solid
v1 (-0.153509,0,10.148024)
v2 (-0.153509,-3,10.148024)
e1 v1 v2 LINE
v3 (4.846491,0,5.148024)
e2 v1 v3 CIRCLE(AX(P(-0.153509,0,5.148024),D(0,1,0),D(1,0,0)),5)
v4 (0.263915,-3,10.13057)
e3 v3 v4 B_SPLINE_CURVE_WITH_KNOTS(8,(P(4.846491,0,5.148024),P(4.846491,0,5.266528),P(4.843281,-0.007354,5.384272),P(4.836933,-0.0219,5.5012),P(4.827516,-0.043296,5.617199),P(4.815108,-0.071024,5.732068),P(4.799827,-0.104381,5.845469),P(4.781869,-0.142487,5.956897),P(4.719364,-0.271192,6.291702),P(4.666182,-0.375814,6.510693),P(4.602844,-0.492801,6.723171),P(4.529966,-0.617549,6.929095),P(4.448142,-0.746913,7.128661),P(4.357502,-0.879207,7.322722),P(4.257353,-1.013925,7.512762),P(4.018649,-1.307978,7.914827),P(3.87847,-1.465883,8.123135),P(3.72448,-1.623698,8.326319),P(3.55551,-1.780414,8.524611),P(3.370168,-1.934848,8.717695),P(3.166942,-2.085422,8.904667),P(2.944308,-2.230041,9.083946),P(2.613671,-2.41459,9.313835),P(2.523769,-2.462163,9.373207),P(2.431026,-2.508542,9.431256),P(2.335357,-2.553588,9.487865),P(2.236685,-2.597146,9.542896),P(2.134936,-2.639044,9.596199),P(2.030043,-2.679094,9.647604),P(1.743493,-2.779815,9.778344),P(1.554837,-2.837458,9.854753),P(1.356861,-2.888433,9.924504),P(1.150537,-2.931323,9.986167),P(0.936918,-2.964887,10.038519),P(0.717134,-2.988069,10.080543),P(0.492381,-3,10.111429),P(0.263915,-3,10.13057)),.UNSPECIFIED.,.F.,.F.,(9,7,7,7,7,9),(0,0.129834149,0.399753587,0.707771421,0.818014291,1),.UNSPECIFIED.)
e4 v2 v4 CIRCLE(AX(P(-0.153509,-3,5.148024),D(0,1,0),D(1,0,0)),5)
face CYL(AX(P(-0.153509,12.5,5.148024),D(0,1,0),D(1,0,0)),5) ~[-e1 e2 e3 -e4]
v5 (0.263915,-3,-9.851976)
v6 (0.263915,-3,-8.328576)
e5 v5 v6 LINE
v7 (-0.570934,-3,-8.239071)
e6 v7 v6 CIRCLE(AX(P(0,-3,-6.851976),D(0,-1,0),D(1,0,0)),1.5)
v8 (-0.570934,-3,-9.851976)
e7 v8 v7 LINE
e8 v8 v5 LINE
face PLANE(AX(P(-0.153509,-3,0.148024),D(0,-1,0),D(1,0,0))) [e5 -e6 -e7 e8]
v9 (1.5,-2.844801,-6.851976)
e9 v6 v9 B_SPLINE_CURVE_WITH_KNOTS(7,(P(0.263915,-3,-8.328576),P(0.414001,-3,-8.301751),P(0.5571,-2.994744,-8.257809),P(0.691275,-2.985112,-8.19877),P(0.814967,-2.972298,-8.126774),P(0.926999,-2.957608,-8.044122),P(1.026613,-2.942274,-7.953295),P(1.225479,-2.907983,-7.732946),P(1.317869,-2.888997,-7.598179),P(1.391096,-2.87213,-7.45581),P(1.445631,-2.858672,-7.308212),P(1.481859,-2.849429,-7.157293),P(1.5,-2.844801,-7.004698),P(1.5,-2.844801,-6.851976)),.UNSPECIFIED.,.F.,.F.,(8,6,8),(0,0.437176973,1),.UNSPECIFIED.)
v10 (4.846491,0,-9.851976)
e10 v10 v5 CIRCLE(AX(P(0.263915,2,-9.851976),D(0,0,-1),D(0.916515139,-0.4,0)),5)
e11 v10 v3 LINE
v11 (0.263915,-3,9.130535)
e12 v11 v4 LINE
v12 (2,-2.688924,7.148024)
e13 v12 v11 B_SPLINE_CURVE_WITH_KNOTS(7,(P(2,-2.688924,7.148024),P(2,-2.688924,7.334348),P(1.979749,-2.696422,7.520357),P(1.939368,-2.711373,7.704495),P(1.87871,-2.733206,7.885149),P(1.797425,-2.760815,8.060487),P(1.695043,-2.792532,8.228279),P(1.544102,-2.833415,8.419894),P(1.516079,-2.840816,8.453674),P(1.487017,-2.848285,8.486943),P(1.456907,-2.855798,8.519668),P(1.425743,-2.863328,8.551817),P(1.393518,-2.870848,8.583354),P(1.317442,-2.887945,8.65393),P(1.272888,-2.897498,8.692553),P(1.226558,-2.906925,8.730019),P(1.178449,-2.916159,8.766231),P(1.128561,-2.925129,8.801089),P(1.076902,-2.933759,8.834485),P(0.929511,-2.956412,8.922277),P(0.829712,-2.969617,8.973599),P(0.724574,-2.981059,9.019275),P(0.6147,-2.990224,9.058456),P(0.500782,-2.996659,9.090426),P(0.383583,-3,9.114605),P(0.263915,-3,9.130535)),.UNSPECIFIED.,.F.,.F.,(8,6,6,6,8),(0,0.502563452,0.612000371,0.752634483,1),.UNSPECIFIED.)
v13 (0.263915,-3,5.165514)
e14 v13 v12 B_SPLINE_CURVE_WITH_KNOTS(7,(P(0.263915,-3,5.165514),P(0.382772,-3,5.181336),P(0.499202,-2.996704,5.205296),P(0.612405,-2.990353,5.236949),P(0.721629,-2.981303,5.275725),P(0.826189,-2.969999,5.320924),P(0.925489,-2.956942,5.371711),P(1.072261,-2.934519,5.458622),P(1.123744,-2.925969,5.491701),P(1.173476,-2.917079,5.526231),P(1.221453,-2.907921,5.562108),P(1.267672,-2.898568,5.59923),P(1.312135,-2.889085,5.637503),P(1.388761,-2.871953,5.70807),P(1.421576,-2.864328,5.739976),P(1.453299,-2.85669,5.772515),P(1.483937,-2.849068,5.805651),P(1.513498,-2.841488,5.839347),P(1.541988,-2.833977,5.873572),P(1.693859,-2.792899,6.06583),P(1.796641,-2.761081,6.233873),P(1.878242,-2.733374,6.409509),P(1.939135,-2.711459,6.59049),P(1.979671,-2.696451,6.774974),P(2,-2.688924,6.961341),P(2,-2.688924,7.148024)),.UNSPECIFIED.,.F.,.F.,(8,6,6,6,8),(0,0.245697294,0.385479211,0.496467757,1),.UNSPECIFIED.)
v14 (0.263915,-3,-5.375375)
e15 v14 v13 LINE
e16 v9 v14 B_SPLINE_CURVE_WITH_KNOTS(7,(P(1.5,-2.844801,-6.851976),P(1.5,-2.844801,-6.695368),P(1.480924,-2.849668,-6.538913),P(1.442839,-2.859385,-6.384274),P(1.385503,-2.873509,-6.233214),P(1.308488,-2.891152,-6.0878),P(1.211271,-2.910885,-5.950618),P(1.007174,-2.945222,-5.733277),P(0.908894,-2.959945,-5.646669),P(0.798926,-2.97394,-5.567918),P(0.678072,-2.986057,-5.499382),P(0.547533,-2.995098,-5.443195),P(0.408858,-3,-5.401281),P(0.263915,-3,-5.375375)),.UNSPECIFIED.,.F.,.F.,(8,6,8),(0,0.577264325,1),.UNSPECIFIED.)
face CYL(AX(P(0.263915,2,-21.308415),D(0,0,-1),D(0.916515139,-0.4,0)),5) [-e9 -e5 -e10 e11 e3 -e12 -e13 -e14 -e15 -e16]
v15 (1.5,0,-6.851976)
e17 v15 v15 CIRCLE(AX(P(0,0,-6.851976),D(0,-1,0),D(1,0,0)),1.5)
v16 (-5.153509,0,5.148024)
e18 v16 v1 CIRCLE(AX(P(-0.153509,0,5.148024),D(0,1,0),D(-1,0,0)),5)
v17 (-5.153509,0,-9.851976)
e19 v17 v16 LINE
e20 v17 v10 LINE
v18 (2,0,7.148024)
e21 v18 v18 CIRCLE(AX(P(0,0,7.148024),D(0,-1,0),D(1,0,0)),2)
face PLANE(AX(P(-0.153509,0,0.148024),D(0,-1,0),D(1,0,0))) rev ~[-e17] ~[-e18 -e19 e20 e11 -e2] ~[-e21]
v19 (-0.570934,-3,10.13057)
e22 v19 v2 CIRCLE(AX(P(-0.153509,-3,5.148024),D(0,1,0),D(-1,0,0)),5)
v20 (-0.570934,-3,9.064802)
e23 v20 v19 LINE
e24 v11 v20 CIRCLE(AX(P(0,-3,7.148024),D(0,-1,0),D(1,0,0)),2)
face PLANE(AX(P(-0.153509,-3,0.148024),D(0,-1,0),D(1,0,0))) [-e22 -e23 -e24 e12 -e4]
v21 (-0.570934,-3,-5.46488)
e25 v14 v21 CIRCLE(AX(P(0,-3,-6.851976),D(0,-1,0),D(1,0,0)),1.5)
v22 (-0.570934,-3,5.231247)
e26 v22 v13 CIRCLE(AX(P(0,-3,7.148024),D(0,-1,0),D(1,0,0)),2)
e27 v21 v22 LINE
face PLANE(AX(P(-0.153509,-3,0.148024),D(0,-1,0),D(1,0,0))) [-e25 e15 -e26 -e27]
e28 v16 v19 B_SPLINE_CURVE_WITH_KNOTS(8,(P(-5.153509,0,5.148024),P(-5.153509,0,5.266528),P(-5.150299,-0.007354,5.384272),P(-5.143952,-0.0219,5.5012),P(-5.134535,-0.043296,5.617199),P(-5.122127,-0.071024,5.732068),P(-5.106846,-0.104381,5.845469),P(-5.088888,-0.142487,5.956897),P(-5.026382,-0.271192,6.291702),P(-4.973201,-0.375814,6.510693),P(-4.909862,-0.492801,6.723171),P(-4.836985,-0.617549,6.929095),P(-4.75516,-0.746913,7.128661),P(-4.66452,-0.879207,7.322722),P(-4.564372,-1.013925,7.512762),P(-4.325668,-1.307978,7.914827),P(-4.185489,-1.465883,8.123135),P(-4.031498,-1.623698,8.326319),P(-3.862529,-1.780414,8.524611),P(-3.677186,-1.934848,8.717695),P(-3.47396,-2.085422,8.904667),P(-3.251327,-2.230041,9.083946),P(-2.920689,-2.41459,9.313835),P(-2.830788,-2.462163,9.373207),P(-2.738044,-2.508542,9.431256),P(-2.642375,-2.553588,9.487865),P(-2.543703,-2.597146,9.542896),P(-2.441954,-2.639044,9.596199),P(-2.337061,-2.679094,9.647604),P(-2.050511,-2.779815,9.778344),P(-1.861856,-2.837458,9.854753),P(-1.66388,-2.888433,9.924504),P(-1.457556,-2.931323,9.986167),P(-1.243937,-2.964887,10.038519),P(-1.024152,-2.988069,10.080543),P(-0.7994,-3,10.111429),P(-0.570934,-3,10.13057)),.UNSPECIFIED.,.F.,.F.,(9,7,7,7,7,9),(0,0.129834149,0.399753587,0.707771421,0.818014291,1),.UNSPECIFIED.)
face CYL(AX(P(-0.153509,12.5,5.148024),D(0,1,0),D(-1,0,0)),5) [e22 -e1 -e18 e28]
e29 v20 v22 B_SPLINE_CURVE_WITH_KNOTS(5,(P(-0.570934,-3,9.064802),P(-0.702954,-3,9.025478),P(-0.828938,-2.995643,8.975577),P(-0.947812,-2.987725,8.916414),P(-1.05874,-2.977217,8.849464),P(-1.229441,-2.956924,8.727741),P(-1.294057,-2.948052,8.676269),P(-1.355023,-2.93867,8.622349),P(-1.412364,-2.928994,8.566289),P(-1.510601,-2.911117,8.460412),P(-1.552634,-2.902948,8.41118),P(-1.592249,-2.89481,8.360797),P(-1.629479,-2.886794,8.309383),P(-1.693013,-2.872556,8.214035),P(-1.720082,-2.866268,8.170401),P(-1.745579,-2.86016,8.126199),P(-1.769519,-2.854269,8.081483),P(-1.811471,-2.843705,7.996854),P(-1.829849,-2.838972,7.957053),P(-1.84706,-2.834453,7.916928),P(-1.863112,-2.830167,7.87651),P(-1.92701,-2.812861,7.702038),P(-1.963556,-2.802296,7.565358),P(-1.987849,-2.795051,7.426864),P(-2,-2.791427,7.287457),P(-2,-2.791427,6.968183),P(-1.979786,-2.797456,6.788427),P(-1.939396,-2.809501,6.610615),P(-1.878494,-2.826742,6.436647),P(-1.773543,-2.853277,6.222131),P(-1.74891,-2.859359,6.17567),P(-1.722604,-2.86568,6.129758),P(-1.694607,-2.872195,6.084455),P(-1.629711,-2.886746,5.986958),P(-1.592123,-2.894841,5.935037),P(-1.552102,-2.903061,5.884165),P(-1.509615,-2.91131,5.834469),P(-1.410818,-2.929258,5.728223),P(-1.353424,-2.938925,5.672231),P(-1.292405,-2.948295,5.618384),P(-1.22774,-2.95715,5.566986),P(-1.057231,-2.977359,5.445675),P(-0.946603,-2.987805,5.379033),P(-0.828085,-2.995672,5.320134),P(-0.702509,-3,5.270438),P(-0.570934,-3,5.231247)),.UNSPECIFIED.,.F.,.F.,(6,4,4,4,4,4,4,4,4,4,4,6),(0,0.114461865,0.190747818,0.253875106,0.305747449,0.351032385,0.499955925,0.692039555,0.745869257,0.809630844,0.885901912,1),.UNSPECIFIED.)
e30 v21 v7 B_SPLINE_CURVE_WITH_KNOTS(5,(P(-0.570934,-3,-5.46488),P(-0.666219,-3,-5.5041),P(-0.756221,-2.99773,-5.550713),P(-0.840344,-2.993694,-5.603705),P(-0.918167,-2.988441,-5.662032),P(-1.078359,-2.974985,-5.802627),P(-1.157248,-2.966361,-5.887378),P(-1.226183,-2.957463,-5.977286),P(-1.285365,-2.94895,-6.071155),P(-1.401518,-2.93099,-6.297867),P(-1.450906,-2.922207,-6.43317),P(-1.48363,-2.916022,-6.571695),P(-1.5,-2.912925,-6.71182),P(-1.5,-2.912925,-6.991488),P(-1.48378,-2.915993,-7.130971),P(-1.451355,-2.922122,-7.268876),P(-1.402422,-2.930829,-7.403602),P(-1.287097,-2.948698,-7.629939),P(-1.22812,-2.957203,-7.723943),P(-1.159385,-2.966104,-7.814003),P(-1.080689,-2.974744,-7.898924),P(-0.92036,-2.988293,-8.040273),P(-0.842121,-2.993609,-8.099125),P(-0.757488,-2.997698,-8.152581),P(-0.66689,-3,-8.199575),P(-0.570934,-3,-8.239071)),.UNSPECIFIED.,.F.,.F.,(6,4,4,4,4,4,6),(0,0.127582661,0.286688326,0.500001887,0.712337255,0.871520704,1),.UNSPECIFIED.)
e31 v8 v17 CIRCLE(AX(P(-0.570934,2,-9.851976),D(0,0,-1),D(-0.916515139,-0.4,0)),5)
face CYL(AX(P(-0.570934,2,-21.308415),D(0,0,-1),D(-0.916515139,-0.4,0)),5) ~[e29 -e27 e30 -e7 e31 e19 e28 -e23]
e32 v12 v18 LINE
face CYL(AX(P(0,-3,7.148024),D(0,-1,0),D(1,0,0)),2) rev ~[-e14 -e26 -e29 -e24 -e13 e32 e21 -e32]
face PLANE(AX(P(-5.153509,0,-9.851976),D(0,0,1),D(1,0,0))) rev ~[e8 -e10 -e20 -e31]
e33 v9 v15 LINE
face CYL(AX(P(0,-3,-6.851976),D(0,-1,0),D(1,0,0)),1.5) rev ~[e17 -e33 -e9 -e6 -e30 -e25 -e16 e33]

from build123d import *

# Parameters (mm, degrees)
F0_W        = 10
F0_H        = 20
F1_DEPTH    = 3
F2_R        = 2
F2_R_2      = 1.5
F3_DEPTH    = 3.001
F4_T1_DEPTH = 28
F4_T3_DEPTH = 42.9128784748


# Not quite as in the source:
# - a fillet or chamfer that OpenCascade refuses, or shapes differently, is made with other operations: its cross-section is extruded or revolved along the edge and cut away or added


with BuildPart() as f1:
    # F0 (on Front) → F1 (new body)
    with BuildSketch(Plane.XZ):
        with Locations((-0.1535092495, 0.14802441)):
            Rectangle(F0_W, F0_H)
    extrude(amount=F1_DEPTH)

    # F2 (on face) → F3 (cut, through all)
    with BuildSketch(Plane.XZ.offset(3)):
        with Locations((0, 7.14802441)):
            Circle(F2_R)
        with Locations((0, -6.85197559)):
            Circle(F2_R_2)
    extrude(amount=-F3_DEPTH, mode=Mode.SUBTRACT)

    # F4: fillet of radius 5 on 4 edges, made by hand

    # F4_s2 → F4_t1 (cut)
    with BuildSketch(Plane.XZ.offset(-12.5)):
        with BuildLine():
            ThreePointArc((4.8464907505, 5.14802441), (3.3820246565, 8.6835583159), (-0.1535092495, 10.14802441))
            Line((-0.1535092495, 10.14802441), (4.8464907505, 10.14802441))
            Line((4.8464907505, 10.14802441), (4.8464907505, 5.14802441))
        make_face()
        with BuildLine():
            ThreePointArc((-5.1535092495, 5.14802441), (-3.6890431554, 8.6835583159), (-0.1535092495, 10.14802441))
            Line((-0.1535092495, 10.14802441), (-5.1535092495, 10.14802441))
            Line((-5.1535092495, 10.14802441), (-5.1535092495, 5.14802441))
        make_face()
    extrude(amount=F4_T1_DEPTH, mode=Mode.SUBTRACT)

    # F4_s4 → F4_t3 (cut)
    with BuildSketch(Plane.XY.offset(-21.3084148274)):
        with BuildLine():
            ThreePointArc((-5.1535092495, 0), (-3.309546342, -2.1833001327), (-0.5709335545, -3))
            Line((-0.5709335545, -3), (-5.1535092495, -3))
            Line((-5.1535092495, -3), (-5.1535092495, 0))
        make_face()
        with BuildLine():
            ThreePointArc((4.8464907505, 0), (3.0025278431, -2.1833001327), (0.2639150556, -3))
            Line((0.2639150556, -3), (4.8464907505, -3))
            Line((4.8464907505, -3), (4.8464907505, 0))
        make_face()
    extrude(amount=F4_T3_DEPTH, mode=Mode.SUBTRACT)


solid = f1.part
